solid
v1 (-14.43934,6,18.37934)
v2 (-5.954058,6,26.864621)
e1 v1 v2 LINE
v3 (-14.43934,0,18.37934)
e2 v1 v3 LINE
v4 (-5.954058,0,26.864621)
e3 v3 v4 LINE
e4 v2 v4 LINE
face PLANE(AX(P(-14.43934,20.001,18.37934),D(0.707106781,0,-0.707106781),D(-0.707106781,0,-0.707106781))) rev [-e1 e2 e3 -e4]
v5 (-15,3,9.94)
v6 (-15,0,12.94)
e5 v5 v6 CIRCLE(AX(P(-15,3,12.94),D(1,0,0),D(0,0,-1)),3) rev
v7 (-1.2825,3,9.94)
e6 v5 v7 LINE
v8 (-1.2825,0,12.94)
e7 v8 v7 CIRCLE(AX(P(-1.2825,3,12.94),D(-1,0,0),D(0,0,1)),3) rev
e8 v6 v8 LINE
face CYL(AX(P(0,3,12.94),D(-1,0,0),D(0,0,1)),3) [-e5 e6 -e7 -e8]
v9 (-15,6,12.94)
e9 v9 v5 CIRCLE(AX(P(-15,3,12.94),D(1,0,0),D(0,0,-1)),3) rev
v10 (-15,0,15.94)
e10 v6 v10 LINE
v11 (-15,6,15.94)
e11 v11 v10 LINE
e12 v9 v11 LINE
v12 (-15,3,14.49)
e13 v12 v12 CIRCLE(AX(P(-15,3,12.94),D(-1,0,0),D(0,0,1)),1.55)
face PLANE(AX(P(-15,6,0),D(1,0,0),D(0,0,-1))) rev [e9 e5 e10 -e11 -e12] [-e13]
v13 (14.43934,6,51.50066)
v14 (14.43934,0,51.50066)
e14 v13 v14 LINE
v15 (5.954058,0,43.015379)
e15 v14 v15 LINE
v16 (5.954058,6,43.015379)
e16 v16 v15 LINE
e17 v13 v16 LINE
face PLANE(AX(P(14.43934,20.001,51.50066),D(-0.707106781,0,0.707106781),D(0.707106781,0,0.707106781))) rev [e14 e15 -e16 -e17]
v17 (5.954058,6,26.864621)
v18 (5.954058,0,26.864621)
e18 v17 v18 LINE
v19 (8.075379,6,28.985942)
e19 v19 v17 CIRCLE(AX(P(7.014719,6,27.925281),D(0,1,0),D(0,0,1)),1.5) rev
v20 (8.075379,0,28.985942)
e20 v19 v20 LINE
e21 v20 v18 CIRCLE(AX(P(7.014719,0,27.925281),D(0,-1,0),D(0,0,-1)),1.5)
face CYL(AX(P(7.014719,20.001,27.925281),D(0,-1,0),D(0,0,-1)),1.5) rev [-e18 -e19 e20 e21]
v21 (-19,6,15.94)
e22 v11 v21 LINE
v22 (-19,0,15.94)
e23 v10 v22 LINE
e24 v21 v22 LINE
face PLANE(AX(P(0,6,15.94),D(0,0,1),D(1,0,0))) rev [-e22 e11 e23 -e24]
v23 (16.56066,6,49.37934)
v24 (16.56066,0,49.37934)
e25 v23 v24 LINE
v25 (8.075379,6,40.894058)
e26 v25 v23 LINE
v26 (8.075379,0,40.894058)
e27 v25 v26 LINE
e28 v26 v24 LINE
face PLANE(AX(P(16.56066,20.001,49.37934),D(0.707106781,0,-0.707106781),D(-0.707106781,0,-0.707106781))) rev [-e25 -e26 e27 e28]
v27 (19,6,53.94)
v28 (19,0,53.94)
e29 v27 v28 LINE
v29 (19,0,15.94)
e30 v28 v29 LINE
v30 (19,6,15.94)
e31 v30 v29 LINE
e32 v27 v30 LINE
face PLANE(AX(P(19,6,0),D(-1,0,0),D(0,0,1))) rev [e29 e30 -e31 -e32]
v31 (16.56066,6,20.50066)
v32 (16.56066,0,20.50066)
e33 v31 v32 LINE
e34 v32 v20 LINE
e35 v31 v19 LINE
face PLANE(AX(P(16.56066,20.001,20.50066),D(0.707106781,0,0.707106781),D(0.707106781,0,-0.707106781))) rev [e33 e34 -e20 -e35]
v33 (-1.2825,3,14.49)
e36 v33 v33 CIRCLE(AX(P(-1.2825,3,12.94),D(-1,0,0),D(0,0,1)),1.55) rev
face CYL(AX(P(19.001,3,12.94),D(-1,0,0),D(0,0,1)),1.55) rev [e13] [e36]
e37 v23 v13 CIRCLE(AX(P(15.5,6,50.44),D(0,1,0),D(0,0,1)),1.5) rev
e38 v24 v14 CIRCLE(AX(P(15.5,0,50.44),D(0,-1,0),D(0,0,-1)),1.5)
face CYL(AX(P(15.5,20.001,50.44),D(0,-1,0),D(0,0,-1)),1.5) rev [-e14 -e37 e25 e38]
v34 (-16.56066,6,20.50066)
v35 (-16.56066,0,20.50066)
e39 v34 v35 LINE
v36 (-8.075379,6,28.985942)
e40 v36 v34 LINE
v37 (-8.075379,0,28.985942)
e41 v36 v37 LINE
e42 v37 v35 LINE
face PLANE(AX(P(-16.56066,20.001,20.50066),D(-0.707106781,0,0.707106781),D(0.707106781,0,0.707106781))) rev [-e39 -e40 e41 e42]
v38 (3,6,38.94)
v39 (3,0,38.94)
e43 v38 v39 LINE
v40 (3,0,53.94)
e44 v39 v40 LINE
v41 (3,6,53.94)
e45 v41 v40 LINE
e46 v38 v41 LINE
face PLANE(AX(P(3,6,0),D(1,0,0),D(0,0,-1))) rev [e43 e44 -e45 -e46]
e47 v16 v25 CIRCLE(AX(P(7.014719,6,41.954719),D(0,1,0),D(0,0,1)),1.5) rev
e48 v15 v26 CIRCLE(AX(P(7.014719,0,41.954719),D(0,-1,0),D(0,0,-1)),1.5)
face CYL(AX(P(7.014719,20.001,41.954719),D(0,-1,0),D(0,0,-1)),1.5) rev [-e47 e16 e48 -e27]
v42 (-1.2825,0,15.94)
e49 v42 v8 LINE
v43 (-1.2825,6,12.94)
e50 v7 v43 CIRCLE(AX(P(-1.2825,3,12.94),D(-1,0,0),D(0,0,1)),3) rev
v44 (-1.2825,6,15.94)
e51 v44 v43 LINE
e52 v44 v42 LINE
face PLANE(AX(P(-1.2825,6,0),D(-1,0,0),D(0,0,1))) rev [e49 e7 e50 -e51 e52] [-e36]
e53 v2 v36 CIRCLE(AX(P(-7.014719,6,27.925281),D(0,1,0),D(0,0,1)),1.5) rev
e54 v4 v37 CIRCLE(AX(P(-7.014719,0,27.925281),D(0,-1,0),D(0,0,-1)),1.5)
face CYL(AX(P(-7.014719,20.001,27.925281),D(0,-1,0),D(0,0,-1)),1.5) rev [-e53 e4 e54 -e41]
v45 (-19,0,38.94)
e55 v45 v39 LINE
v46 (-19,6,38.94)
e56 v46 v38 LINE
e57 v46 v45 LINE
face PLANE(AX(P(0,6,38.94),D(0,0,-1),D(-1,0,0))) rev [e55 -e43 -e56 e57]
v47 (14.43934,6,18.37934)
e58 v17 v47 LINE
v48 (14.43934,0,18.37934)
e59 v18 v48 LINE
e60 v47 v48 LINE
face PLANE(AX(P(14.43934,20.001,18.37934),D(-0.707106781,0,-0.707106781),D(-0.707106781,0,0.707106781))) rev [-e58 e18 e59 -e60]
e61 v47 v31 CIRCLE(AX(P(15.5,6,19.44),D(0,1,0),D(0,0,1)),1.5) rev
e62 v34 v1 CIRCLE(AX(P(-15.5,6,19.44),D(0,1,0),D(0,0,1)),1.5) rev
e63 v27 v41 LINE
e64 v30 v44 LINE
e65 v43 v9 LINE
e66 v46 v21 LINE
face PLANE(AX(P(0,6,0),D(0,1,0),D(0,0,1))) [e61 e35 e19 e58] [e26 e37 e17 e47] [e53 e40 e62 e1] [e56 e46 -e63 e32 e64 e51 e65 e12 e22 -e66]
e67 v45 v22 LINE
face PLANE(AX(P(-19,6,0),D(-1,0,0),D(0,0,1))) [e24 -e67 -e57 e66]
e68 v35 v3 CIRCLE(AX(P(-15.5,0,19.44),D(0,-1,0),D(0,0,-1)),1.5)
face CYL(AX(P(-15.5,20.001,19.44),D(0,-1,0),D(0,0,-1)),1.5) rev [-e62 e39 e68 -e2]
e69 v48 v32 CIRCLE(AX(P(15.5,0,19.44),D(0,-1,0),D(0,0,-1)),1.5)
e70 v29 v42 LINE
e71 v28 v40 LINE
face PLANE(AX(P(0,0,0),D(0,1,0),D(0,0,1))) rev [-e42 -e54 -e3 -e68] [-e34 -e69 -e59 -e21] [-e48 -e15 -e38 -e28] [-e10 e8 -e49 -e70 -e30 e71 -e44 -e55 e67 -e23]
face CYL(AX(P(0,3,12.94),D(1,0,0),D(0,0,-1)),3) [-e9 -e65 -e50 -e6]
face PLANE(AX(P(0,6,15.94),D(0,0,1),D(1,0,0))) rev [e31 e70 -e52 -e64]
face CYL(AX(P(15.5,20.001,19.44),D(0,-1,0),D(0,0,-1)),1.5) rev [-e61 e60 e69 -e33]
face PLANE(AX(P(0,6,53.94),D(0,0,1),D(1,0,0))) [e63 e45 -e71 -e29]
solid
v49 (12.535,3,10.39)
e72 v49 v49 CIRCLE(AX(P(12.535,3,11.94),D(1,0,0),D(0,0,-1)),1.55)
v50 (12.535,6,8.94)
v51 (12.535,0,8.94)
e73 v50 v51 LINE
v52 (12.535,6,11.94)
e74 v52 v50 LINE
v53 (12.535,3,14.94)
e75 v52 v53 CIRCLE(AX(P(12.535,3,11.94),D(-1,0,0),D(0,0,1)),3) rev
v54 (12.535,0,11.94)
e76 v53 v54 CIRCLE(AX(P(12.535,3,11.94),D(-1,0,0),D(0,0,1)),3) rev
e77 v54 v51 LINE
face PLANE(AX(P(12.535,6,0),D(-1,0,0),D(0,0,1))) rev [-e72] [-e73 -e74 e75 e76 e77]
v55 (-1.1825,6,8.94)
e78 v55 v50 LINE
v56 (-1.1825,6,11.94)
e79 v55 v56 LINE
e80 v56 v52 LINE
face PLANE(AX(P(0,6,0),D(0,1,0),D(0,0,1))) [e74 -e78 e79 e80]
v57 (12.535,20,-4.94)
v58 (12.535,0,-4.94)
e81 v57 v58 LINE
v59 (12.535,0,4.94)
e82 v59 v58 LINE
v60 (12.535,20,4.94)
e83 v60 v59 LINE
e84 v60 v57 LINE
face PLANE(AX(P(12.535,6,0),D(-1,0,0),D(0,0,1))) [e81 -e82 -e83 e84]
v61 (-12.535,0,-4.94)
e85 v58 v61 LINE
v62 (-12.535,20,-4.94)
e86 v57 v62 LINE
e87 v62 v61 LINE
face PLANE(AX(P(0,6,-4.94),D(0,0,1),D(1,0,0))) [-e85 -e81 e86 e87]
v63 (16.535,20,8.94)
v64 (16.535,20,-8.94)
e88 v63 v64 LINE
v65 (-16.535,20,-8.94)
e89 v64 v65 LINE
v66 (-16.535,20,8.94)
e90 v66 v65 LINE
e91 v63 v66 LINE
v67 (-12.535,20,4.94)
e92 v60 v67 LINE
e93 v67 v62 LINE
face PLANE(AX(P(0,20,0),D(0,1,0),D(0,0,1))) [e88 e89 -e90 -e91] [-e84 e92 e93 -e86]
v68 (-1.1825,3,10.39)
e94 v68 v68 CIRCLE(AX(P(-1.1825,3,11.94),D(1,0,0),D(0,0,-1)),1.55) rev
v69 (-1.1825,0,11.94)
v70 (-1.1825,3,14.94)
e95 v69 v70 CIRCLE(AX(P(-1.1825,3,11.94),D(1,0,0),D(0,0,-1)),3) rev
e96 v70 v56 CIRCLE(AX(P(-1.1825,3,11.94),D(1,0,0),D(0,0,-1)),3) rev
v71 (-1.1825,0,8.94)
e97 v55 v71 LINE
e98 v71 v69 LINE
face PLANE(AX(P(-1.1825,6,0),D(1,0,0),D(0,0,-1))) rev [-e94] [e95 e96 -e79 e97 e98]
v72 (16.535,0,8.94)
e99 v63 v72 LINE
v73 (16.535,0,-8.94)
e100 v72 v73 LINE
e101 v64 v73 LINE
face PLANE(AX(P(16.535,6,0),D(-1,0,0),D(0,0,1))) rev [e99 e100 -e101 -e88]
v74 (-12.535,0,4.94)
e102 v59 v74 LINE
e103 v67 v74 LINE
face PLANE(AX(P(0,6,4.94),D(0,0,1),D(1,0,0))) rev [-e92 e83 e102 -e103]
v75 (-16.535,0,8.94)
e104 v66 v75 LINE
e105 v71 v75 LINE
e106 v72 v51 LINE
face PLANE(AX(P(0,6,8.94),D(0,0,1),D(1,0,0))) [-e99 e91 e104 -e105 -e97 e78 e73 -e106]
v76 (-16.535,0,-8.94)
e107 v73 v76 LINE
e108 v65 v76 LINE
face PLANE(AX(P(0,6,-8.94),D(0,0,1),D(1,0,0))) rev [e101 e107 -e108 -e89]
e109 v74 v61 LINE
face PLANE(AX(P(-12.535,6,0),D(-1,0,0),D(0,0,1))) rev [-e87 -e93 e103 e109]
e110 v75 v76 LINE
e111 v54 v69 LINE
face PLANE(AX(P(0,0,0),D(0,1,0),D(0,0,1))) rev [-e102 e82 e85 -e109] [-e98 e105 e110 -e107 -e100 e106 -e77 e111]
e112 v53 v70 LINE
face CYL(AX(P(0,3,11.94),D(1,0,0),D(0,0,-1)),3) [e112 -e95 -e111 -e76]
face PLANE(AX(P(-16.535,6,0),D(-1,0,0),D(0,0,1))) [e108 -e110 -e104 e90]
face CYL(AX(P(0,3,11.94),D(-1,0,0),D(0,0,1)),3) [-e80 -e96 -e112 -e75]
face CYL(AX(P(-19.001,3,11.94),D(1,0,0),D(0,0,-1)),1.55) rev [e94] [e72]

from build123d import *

# Parameters (mm, degrees)
SKETCH1_W             = 25.07
SKETCH1_H             = 9.88
BOSS_EXTRUDE1_DEPTH   = 6
BOSS_EXTRUDE1_2_DEPTH = 6
SKETCH1_3_W           = 33.07
SKETCH1_3_H           = 17.88
SKETCH1_3_W_2         = 25.07
SKETCH1_3_H_2         = 9.88
BOSS_EXTRUDE2_DEPTH   = 20
FILLET1_R             = 3
FILLET2_R             = 3
SKETCH2_R             = 1.55
CUT_EXTRUDE1_DEPTH    = 13.7175
SKETCH4_R             = 1.55
CUT_EXTRUDE2_DEPTH    = 13.7175
CUT_EXTRUDE3_DEPTH    = 6


with BuildPart() as part:
    # Sketch1 → Boss-Extrude1 (new body)
    with BuildSketch(Plane(origin=(0, 0, 0), x_dir=(1, 0, 0), z_dir=(0, 1, 0))):
        Polygon((16.535, -8.94), (16.535, 8.94), (-16.535, 8.94), (-16.535, -8.94), (-1.1825, -8.94), (-1.1825, -14.94), (12.535, -14.94), (12.535, -8.94), align=None)
        Rectangle(SKETCH1_W, SKETCH1_H, mode=Mode.SUBTRACT)
    extrude(amount=BOSS_EXTRUDE1_DEPTH)

    # Sketch1<3> → Boss-Extrude2 (add)
    with BuildSketch(Plane(origin=(0, 0, 0), x_dir=(1, 0, 0), z_dir=(0, 1, 0))):
        Rectangle(SKETCH1_3_W, SKETCH1_3_H)
        Rectangle(SKETCH1_3_W_2, SKETCH1_3_H_2, mode=Mode.SUBTRACT)
    extrude(amount=BOSS_EXTRUDE2_DEPTH)

    # Fillet1
    fillet1_edges = [part.edges().sort_by_distance(p)[0] for p in [
        (5.67625, 0, 14.94),
        (5.67625, 6, 14.94),
    ]]
    fillet(fillet1_edges, radius=FILLET1_R - 0.0001)  # a hair under: the kernel refuses the full size

    # Sketch2 → Cut-Extrude1 (cut)
    with BuildSketch(Plane(origin=(12.535, 0, 0), x_dir=(0, 0, -1), z_dir=(1, 0, 0))):
        with Locations((-11.94, 3)):
            Circle(SKETCH2_R)
    extrude(amount=-CUT_EXTRUDE1_DEPTH, mode=Mode.SUBTRACT)


with BuildPart() as body_2:
    # Sketch1 → Boss-Extrude1 2 (new body)
    with BuildSketch(Plane(origin=(0, 0, 0), x_dir=(1, 0, 0), z_dir=(0, 1, 0))):
        Polygon((-1.2825, -15.94), (-1.2825, -9.94), (-15, -9.94), (-15, -15.94), (-19, -15.94), (-19, -38.94), (3, -38.94), (3, -53.94), (19, -53.94), (19, -15.94), align=None)
    extrude(amount=BOSS_EXTRUDE1_2_DEPTH)

    # Fillet2
    fillet2_edges = [body_2.edges().sort_by_distance(p)[0] for p in [
        (-8.14125, 0, 9.94),
        (-8.14125, 6, 9.94),
    ]]
    fillet(fillet2_edges, radius=FILLET2_R - 0.0001)  # a hair under: the kernel refuses the full size

    # Sketch4 → Cut-Extrude2 (cut)
    with BuildSketch(Plane.ZY.offset(15)):
        with Locations((12.94, 3)):
            Circle(SKETCH4_R)
    extrude(amount=-CUT_EXTRUDE2_DEPTH, mode=Mode.SUBTRACT)

    # Sketch5 → Cut-Extrude3 (cut)
    with BuildSketch(Plane.XZ):
        with BuildLine():
            Line((-16.560660172, 20.500660172), (-8.075378798, 28.985941546))
            ThreePointArc((-8.075378798, 28.985941546), (-5.954058454, 28.985941546), (-5.954058454, 26.864621202))
            Line((-5.954058454, 26.864621202), (-14.439339828, 18.379339828))
            ThreePointArc((-14.439339828, 18.379339828), (-16.560660172, 18.379339828), (-16.560660172, 20.500660172))
        make_face()
        with BuildLine():
            Line((16.560660172, 49.379339828), (8.075378798, 40.894058454))
            ThreePointArc((8.075378798, 40.894058454), (5.954058454, 40.894058454), (5.954058454, 43.015378798))
            Line((5.954058454, 43.015378798), (14.439339828, 51.500660172))
            ThreePointArc((14.439339828, 51.500660172), (16.560660172, 51.500660172), (16.560660172, 49.379339828))
        make_face()
        with BuildLine():
            Line((14.439339828, 18.379339828), (5.954058454, 26.864621202))
            ThreePointArc((5.954058454, 26.864621202), (5.954058454, 28.985941546), (8.075378798, 28.985941546))
            Line((8.075378798, 28.985941546), (16.560660172, 20.500660172))
            ThreePointArc((16.560660172, 20.500660172), (16.560660172, 18.379339828), (14.439339828, 18.379339828))
        make_face()
    extrude(amount=-CUT_EXTRUDE3_DEPTH, mode=Mode.SUBTRACT)


solid = Compound([part.part, body_2.part])
